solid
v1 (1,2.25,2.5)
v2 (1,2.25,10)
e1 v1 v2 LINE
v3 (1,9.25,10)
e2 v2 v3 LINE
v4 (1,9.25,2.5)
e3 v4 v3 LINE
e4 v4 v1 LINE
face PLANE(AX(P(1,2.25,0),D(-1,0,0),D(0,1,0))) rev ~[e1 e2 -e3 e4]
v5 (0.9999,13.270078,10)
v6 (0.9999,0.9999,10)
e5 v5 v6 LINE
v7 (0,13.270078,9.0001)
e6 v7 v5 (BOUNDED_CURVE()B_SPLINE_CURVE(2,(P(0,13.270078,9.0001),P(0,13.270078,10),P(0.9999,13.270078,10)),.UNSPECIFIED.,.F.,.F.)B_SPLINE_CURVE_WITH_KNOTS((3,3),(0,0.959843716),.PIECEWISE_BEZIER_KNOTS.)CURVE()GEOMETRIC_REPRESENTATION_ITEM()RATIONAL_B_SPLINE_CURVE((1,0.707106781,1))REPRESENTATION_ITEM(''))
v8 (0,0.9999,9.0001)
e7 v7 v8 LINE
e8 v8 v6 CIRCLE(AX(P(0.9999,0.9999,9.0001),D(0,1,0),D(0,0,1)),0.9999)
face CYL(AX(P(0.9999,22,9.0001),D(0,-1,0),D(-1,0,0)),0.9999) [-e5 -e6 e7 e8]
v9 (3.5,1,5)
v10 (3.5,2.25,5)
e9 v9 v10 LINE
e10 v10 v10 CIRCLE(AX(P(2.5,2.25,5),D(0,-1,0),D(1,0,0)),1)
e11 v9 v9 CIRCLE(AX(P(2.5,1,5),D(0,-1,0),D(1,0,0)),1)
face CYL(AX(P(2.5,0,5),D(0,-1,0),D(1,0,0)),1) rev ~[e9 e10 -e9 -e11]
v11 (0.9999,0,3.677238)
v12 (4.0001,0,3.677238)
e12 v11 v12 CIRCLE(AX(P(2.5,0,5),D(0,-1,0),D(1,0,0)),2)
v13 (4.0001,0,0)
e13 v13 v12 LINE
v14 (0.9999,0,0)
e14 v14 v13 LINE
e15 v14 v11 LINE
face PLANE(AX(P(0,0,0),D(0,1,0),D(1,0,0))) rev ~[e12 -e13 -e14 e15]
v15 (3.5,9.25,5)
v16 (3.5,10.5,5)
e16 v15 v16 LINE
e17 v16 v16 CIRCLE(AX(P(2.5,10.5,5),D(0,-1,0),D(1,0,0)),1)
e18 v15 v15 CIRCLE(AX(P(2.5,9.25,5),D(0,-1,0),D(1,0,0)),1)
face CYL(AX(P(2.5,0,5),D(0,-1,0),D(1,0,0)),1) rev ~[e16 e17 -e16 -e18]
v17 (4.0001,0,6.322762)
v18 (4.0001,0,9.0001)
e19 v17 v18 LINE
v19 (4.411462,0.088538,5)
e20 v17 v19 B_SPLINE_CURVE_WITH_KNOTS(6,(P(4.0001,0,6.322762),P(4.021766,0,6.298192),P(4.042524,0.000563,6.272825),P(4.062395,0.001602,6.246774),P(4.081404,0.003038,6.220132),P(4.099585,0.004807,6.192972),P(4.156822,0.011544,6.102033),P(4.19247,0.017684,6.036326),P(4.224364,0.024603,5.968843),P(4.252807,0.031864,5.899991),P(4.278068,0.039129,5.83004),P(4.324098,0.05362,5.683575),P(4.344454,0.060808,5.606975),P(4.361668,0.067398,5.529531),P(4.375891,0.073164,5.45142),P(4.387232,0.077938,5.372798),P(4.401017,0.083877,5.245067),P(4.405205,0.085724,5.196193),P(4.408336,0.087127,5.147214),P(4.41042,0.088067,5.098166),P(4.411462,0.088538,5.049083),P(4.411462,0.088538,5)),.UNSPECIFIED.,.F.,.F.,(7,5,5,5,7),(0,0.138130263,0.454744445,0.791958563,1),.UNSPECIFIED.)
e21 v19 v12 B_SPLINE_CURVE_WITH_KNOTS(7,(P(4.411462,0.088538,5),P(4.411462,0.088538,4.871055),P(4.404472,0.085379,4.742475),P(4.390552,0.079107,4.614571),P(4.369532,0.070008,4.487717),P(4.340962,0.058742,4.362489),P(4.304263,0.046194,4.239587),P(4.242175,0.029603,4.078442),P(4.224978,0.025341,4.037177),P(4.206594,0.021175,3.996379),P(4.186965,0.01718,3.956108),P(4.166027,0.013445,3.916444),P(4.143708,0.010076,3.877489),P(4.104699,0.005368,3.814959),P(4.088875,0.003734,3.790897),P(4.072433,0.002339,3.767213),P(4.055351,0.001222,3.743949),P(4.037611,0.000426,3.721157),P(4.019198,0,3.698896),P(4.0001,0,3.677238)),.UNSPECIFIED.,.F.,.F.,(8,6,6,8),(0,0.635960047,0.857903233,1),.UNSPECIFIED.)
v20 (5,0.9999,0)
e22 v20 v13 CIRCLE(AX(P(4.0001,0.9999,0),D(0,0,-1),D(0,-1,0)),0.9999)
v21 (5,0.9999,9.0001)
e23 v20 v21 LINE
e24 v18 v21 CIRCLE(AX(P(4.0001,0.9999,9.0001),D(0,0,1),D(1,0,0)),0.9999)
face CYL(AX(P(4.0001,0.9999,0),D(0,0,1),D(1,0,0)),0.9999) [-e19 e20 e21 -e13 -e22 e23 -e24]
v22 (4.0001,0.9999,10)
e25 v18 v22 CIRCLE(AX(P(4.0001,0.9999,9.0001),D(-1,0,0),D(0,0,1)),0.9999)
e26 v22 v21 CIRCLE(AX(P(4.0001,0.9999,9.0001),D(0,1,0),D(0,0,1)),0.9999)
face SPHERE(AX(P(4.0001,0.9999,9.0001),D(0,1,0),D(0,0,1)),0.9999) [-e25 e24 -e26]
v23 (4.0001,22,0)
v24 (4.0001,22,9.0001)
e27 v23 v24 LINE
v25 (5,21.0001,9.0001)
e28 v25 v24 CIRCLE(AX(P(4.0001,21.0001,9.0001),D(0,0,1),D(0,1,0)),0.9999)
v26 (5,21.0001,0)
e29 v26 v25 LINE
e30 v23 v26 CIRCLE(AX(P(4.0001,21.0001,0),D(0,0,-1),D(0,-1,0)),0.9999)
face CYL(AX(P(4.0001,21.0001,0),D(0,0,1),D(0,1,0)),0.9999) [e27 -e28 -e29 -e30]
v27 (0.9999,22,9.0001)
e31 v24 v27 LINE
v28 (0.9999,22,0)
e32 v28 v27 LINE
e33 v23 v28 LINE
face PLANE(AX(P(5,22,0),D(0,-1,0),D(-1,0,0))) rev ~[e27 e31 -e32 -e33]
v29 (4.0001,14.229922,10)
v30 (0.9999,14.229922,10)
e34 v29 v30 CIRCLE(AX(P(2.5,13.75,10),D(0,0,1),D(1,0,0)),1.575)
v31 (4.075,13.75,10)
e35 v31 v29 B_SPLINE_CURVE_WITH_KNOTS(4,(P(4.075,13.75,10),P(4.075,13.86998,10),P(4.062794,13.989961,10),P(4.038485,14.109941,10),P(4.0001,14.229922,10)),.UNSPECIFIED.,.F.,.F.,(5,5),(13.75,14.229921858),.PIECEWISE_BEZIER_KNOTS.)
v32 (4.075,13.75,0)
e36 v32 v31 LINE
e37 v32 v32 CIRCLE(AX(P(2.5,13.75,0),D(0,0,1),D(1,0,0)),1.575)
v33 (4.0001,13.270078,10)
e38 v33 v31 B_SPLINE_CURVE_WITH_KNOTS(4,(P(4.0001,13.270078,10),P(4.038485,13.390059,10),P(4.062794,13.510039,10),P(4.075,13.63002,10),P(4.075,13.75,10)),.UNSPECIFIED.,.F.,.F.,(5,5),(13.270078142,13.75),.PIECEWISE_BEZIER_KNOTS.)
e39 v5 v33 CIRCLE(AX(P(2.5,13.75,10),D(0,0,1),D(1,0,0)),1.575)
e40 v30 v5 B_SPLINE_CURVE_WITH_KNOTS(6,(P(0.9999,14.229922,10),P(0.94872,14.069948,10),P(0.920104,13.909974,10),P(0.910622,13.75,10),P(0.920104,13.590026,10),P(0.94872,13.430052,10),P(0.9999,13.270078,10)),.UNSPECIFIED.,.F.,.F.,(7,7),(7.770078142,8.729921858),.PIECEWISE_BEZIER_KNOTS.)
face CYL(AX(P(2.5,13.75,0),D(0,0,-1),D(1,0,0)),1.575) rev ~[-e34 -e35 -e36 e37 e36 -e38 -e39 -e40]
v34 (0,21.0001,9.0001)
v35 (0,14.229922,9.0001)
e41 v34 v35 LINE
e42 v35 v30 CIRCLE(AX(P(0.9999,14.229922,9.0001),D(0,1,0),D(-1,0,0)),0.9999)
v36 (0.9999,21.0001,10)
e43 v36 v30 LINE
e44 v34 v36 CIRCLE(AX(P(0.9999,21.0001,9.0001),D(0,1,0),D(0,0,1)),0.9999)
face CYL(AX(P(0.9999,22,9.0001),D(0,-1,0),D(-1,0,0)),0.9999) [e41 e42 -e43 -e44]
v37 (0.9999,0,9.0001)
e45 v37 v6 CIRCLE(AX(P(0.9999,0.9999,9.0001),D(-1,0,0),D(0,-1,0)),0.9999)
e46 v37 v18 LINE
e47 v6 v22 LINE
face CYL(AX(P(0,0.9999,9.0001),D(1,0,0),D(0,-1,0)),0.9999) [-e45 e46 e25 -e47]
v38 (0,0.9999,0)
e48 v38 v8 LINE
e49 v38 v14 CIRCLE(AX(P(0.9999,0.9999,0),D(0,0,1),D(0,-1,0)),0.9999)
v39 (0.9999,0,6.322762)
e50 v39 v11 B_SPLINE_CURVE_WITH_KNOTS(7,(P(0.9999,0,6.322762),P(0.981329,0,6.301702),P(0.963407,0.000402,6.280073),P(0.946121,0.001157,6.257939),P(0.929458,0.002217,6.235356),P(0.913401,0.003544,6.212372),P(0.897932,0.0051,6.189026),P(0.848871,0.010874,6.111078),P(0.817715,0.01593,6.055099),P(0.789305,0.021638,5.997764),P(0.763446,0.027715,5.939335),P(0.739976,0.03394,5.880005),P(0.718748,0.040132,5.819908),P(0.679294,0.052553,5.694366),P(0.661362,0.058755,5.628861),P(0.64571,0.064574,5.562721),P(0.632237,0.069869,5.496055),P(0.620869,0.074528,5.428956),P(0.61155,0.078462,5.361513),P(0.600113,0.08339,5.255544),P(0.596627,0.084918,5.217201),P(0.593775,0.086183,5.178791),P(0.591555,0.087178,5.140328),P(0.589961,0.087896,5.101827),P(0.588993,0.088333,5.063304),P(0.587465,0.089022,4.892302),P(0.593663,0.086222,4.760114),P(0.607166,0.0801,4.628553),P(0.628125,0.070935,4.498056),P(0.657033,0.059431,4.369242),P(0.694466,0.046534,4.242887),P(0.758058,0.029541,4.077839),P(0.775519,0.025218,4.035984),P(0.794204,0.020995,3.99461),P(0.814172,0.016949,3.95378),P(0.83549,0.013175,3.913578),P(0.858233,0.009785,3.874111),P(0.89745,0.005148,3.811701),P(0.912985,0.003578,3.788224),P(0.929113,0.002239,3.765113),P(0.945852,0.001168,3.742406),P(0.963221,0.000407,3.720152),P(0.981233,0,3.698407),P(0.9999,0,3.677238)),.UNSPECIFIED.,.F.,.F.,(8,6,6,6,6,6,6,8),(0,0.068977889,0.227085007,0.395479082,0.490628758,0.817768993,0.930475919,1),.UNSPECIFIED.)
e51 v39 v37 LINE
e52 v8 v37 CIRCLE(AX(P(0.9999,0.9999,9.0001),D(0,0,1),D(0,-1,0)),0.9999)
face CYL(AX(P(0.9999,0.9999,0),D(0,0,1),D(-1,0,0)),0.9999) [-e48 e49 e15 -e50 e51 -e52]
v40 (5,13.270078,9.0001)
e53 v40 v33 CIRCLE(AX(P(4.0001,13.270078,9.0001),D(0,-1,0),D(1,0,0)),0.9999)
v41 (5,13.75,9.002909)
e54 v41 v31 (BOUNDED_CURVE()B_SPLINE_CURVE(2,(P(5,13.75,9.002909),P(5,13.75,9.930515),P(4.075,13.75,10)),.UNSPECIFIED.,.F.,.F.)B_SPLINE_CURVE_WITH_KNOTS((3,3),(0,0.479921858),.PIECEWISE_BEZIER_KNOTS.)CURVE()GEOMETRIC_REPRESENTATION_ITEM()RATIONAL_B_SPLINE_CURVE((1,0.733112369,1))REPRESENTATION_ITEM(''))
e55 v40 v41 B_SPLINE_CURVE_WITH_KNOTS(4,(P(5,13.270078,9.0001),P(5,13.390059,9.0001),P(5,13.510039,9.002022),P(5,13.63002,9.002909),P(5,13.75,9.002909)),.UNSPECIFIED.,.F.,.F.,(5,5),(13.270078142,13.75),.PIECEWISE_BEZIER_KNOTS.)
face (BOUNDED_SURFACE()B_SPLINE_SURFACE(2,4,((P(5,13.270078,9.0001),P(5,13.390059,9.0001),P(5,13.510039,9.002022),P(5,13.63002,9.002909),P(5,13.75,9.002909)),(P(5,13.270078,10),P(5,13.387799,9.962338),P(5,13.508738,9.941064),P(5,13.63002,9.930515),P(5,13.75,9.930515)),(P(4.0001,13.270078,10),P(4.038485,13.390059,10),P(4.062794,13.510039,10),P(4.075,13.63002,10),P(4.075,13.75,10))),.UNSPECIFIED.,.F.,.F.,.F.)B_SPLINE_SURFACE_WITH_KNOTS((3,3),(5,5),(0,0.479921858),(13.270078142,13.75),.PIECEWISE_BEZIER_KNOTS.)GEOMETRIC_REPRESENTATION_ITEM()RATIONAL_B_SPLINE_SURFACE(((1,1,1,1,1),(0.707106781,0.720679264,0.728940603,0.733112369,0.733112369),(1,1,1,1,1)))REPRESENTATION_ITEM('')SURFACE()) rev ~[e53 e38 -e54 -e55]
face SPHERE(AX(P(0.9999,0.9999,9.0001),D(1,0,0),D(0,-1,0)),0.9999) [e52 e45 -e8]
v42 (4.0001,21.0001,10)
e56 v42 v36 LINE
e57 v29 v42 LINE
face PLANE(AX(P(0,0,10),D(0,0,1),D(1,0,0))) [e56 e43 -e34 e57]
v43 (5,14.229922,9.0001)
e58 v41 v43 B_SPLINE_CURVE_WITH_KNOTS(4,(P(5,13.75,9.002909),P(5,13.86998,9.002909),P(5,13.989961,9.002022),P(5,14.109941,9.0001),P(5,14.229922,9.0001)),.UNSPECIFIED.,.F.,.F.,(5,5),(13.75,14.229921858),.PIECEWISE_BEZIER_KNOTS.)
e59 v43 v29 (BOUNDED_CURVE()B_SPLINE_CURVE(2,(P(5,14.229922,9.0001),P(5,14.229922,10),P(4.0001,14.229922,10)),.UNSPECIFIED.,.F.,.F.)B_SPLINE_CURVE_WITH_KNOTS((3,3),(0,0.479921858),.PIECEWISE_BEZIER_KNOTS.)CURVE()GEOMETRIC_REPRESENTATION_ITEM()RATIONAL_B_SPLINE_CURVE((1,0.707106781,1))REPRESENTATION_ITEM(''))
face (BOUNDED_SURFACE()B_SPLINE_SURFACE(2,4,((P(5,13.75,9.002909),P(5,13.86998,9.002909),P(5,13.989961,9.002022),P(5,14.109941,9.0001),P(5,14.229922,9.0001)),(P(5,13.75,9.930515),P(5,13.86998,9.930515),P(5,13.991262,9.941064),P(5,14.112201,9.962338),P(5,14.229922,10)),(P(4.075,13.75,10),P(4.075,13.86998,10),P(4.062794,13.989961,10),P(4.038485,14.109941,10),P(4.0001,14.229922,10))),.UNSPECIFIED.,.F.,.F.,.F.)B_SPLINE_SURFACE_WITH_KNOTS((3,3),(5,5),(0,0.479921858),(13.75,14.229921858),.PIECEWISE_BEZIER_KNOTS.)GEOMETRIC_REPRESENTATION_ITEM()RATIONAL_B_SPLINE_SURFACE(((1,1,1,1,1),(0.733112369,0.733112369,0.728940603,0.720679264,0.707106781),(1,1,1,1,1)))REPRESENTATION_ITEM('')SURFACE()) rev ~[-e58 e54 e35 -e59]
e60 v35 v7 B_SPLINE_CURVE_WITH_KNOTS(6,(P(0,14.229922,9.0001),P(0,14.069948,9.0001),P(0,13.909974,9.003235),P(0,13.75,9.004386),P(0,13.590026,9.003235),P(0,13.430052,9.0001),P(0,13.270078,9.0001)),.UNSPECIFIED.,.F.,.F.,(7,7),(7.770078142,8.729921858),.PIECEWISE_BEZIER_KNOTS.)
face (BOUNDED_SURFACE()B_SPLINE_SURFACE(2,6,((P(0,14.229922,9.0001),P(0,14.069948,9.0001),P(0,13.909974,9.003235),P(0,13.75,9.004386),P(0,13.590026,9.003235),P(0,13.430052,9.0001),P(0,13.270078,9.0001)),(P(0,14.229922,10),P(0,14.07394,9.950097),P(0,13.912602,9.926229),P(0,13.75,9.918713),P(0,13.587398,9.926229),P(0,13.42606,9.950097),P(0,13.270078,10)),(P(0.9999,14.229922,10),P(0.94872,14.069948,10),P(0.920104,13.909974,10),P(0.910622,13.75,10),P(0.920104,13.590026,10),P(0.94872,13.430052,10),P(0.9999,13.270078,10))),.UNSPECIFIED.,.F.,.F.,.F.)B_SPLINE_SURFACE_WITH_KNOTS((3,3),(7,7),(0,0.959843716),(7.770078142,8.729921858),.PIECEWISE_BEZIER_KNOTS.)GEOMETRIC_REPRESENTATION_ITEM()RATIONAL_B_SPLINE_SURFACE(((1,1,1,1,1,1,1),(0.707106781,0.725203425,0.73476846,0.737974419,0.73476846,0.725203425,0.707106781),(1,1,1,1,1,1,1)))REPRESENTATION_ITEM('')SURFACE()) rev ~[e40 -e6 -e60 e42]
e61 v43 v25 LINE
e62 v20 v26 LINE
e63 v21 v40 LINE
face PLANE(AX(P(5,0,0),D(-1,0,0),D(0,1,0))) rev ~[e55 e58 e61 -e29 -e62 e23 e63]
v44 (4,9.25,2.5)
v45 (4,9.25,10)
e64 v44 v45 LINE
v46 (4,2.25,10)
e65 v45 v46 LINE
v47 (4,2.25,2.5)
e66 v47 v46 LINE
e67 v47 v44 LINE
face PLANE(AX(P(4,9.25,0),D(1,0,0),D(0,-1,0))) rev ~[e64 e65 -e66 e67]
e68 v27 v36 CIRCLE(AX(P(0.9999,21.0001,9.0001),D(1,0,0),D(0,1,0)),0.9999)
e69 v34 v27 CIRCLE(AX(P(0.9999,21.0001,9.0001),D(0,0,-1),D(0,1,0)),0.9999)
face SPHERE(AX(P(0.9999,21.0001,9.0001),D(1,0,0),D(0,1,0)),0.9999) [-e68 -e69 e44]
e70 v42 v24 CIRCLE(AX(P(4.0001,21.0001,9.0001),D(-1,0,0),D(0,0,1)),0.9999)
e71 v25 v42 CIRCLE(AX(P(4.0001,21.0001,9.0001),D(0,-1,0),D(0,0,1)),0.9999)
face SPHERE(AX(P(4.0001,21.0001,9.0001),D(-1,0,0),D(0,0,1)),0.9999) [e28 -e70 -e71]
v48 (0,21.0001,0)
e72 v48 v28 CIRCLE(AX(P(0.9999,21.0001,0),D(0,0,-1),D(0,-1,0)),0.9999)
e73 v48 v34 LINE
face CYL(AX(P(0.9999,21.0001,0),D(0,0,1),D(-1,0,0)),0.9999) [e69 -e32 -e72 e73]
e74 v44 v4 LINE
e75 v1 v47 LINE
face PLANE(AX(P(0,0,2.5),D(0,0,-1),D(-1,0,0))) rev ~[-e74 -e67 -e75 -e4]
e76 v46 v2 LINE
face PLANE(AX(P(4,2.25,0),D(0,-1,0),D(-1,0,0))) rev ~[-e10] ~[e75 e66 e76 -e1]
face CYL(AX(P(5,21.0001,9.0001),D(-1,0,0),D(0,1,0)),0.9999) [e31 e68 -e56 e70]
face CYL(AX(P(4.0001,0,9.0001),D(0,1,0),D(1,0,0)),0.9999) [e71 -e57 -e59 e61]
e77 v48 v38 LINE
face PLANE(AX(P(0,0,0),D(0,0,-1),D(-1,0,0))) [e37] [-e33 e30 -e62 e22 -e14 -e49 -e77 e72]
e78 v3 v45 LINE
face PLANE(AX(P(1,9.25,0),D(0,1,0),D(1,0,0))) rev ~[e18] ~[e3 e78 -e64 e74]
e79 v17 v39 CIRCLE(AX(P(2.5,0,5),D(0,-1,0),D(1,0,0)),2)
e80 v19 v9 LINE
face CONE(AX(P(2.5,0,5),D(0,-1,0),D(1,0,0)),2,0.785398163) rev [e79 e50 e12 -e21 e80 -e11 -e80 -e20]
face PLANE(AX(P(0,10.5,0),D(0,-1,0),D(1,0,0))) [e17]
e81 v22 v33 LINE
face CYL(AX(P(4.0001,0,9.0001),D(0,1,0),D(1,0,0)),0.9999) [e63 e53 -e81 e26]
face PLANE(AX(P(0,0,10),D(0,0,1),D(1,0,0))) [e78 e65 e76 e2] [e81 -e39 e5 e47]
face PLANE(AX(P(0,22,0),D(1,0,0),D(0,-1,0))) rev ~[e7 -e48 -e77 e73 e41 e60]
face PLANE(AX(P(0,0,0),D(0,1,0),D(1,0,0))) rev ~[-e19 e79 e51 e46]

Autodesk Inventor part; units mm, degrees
ref_plane "YZ Plane" through (0, 0, 0) normal (1, 0, 0) x (0, 1, 0)
ref_plane "XZ Plane" through (0, 0, 0) normal (0, 1, 0) x (-1, 0, 0)
ref_plane "XY Plane" through (0, 0, 0) normal (0, 0, 1) x (1, 0, 0)
sketch "Sketch1" plane through (0, 0, 0) normal (0, 0, 1) x (1, 0, 0)
  line L0 (0, 0) -> (5, 0)
  line L1 (5, 0) -> (5, 22)
  line L2 (5, 22) -> (0, 22)
  line L3 (0, 22) -> (0, 0)
  line L4 (2.5, 0) -> (2.5, 22) construction
  circle A0 centre (2.5, 13.75) radius 1.575
  line L5 (4, 2.25) -> (1, 2.25)
  line L6 (1, 2.25) -> (1, 9.25)
  line L7 (1, 9.25) -> (4, 9.25)
  line L8 (4, 9.25) -> (4, 2.25)
  dimension "d0" = 5
  dimension "d1" = 22
  dimension "d2" = 3.15
  dimension "d3" = 13.75
  dimension "d7" = 7
  dimension "d8" = 2.25
  dimension "d9" = 1
  dimension "d10" = 1
extrude "Extrusion1" add sketch "Sketch1" along normal blind 10
fillet "Fillet1" radius 1 8 edges at (2.5, 22, 10) (5, 11, 10) (2.5, 0, 10) (5, 22, 5) (0, 22, 5) (5, 0, 5) (0, 0, 5) (0, 11, 10)
sketch "Sketch2" plane through (0, 0, 0) normal (0, 0, -1) x (-1, 0, 0)
  line L0 (-1, 0) -> (-4, 0) projected
  line L1 (0, 21) -> (0, 1) projected
  line L2 (-4, 22) -> (-1, 22) projected
  line L3 (-5, 1) -> (-5, 21) projected
  line L4 (-1, 9.25) -> (-1, 2.25) projected
  line L5 (-1, 2.25) -> (-4, 2.25) projected
  line L6 (-4, 2.25) -> (-4, 9.25) projected
  line L7 (-4, 9.25) -> (-1, 9.25) projected
  circle A0 centre (-2.5, 13.75) radius 1.575 projected
  arc A1 (-5, 1) -> (-4, 0) centre (-4, 1) ccw projected
  arc A2 (-1, 0) -> (0, 1) centre (-1, 1) ccw projected
  arc A3 (0, 21) -> (-1, 22) centre (-1, 21) ccw projected
  arc A4 (-4, 22) -> (-5, 21) centre (-4, 21) ccw projected
  point P0 (0, 0)
extrude "Extrusion2" add sketch "Sketch2" against normal blind 2.5 contours L4 L5 L6 L7
sketch "Sketch4" plane through (0, 0, 0) normal (0, -1, 0) x (1, 0, 0)
  line L0 (1, 0) -> (4, 0) projected
  line L1 (1, 10) -> (4, 10) construction
  line L2 (2.5, 10) -> (2.5, 0) construction
  line L3 (4.075, 0) -> (0.925, 0) construction
  circle A0 centre (2.5, 5) radius 1
  line L4 (4, 9) -> (4, 0) projected
  line L5 (1, 9) -> (4, 9) projected
  line L6 (1, 0) -> (1, 9) projected
  point P0 (0, 0)
  dimension "d13" = 2
  dimension "d14" = 5
extrude "Extrusion3" cut sketch "Sketch4" against normal blind 10.5 contours A0
chamfer "Chamfer1" distance 1 angle 45 1 edges at (1.5, 0, 5)
equation "\"d10\" = d9"
properties part number "hotend__belt_holder" material "ABS Plastic"
